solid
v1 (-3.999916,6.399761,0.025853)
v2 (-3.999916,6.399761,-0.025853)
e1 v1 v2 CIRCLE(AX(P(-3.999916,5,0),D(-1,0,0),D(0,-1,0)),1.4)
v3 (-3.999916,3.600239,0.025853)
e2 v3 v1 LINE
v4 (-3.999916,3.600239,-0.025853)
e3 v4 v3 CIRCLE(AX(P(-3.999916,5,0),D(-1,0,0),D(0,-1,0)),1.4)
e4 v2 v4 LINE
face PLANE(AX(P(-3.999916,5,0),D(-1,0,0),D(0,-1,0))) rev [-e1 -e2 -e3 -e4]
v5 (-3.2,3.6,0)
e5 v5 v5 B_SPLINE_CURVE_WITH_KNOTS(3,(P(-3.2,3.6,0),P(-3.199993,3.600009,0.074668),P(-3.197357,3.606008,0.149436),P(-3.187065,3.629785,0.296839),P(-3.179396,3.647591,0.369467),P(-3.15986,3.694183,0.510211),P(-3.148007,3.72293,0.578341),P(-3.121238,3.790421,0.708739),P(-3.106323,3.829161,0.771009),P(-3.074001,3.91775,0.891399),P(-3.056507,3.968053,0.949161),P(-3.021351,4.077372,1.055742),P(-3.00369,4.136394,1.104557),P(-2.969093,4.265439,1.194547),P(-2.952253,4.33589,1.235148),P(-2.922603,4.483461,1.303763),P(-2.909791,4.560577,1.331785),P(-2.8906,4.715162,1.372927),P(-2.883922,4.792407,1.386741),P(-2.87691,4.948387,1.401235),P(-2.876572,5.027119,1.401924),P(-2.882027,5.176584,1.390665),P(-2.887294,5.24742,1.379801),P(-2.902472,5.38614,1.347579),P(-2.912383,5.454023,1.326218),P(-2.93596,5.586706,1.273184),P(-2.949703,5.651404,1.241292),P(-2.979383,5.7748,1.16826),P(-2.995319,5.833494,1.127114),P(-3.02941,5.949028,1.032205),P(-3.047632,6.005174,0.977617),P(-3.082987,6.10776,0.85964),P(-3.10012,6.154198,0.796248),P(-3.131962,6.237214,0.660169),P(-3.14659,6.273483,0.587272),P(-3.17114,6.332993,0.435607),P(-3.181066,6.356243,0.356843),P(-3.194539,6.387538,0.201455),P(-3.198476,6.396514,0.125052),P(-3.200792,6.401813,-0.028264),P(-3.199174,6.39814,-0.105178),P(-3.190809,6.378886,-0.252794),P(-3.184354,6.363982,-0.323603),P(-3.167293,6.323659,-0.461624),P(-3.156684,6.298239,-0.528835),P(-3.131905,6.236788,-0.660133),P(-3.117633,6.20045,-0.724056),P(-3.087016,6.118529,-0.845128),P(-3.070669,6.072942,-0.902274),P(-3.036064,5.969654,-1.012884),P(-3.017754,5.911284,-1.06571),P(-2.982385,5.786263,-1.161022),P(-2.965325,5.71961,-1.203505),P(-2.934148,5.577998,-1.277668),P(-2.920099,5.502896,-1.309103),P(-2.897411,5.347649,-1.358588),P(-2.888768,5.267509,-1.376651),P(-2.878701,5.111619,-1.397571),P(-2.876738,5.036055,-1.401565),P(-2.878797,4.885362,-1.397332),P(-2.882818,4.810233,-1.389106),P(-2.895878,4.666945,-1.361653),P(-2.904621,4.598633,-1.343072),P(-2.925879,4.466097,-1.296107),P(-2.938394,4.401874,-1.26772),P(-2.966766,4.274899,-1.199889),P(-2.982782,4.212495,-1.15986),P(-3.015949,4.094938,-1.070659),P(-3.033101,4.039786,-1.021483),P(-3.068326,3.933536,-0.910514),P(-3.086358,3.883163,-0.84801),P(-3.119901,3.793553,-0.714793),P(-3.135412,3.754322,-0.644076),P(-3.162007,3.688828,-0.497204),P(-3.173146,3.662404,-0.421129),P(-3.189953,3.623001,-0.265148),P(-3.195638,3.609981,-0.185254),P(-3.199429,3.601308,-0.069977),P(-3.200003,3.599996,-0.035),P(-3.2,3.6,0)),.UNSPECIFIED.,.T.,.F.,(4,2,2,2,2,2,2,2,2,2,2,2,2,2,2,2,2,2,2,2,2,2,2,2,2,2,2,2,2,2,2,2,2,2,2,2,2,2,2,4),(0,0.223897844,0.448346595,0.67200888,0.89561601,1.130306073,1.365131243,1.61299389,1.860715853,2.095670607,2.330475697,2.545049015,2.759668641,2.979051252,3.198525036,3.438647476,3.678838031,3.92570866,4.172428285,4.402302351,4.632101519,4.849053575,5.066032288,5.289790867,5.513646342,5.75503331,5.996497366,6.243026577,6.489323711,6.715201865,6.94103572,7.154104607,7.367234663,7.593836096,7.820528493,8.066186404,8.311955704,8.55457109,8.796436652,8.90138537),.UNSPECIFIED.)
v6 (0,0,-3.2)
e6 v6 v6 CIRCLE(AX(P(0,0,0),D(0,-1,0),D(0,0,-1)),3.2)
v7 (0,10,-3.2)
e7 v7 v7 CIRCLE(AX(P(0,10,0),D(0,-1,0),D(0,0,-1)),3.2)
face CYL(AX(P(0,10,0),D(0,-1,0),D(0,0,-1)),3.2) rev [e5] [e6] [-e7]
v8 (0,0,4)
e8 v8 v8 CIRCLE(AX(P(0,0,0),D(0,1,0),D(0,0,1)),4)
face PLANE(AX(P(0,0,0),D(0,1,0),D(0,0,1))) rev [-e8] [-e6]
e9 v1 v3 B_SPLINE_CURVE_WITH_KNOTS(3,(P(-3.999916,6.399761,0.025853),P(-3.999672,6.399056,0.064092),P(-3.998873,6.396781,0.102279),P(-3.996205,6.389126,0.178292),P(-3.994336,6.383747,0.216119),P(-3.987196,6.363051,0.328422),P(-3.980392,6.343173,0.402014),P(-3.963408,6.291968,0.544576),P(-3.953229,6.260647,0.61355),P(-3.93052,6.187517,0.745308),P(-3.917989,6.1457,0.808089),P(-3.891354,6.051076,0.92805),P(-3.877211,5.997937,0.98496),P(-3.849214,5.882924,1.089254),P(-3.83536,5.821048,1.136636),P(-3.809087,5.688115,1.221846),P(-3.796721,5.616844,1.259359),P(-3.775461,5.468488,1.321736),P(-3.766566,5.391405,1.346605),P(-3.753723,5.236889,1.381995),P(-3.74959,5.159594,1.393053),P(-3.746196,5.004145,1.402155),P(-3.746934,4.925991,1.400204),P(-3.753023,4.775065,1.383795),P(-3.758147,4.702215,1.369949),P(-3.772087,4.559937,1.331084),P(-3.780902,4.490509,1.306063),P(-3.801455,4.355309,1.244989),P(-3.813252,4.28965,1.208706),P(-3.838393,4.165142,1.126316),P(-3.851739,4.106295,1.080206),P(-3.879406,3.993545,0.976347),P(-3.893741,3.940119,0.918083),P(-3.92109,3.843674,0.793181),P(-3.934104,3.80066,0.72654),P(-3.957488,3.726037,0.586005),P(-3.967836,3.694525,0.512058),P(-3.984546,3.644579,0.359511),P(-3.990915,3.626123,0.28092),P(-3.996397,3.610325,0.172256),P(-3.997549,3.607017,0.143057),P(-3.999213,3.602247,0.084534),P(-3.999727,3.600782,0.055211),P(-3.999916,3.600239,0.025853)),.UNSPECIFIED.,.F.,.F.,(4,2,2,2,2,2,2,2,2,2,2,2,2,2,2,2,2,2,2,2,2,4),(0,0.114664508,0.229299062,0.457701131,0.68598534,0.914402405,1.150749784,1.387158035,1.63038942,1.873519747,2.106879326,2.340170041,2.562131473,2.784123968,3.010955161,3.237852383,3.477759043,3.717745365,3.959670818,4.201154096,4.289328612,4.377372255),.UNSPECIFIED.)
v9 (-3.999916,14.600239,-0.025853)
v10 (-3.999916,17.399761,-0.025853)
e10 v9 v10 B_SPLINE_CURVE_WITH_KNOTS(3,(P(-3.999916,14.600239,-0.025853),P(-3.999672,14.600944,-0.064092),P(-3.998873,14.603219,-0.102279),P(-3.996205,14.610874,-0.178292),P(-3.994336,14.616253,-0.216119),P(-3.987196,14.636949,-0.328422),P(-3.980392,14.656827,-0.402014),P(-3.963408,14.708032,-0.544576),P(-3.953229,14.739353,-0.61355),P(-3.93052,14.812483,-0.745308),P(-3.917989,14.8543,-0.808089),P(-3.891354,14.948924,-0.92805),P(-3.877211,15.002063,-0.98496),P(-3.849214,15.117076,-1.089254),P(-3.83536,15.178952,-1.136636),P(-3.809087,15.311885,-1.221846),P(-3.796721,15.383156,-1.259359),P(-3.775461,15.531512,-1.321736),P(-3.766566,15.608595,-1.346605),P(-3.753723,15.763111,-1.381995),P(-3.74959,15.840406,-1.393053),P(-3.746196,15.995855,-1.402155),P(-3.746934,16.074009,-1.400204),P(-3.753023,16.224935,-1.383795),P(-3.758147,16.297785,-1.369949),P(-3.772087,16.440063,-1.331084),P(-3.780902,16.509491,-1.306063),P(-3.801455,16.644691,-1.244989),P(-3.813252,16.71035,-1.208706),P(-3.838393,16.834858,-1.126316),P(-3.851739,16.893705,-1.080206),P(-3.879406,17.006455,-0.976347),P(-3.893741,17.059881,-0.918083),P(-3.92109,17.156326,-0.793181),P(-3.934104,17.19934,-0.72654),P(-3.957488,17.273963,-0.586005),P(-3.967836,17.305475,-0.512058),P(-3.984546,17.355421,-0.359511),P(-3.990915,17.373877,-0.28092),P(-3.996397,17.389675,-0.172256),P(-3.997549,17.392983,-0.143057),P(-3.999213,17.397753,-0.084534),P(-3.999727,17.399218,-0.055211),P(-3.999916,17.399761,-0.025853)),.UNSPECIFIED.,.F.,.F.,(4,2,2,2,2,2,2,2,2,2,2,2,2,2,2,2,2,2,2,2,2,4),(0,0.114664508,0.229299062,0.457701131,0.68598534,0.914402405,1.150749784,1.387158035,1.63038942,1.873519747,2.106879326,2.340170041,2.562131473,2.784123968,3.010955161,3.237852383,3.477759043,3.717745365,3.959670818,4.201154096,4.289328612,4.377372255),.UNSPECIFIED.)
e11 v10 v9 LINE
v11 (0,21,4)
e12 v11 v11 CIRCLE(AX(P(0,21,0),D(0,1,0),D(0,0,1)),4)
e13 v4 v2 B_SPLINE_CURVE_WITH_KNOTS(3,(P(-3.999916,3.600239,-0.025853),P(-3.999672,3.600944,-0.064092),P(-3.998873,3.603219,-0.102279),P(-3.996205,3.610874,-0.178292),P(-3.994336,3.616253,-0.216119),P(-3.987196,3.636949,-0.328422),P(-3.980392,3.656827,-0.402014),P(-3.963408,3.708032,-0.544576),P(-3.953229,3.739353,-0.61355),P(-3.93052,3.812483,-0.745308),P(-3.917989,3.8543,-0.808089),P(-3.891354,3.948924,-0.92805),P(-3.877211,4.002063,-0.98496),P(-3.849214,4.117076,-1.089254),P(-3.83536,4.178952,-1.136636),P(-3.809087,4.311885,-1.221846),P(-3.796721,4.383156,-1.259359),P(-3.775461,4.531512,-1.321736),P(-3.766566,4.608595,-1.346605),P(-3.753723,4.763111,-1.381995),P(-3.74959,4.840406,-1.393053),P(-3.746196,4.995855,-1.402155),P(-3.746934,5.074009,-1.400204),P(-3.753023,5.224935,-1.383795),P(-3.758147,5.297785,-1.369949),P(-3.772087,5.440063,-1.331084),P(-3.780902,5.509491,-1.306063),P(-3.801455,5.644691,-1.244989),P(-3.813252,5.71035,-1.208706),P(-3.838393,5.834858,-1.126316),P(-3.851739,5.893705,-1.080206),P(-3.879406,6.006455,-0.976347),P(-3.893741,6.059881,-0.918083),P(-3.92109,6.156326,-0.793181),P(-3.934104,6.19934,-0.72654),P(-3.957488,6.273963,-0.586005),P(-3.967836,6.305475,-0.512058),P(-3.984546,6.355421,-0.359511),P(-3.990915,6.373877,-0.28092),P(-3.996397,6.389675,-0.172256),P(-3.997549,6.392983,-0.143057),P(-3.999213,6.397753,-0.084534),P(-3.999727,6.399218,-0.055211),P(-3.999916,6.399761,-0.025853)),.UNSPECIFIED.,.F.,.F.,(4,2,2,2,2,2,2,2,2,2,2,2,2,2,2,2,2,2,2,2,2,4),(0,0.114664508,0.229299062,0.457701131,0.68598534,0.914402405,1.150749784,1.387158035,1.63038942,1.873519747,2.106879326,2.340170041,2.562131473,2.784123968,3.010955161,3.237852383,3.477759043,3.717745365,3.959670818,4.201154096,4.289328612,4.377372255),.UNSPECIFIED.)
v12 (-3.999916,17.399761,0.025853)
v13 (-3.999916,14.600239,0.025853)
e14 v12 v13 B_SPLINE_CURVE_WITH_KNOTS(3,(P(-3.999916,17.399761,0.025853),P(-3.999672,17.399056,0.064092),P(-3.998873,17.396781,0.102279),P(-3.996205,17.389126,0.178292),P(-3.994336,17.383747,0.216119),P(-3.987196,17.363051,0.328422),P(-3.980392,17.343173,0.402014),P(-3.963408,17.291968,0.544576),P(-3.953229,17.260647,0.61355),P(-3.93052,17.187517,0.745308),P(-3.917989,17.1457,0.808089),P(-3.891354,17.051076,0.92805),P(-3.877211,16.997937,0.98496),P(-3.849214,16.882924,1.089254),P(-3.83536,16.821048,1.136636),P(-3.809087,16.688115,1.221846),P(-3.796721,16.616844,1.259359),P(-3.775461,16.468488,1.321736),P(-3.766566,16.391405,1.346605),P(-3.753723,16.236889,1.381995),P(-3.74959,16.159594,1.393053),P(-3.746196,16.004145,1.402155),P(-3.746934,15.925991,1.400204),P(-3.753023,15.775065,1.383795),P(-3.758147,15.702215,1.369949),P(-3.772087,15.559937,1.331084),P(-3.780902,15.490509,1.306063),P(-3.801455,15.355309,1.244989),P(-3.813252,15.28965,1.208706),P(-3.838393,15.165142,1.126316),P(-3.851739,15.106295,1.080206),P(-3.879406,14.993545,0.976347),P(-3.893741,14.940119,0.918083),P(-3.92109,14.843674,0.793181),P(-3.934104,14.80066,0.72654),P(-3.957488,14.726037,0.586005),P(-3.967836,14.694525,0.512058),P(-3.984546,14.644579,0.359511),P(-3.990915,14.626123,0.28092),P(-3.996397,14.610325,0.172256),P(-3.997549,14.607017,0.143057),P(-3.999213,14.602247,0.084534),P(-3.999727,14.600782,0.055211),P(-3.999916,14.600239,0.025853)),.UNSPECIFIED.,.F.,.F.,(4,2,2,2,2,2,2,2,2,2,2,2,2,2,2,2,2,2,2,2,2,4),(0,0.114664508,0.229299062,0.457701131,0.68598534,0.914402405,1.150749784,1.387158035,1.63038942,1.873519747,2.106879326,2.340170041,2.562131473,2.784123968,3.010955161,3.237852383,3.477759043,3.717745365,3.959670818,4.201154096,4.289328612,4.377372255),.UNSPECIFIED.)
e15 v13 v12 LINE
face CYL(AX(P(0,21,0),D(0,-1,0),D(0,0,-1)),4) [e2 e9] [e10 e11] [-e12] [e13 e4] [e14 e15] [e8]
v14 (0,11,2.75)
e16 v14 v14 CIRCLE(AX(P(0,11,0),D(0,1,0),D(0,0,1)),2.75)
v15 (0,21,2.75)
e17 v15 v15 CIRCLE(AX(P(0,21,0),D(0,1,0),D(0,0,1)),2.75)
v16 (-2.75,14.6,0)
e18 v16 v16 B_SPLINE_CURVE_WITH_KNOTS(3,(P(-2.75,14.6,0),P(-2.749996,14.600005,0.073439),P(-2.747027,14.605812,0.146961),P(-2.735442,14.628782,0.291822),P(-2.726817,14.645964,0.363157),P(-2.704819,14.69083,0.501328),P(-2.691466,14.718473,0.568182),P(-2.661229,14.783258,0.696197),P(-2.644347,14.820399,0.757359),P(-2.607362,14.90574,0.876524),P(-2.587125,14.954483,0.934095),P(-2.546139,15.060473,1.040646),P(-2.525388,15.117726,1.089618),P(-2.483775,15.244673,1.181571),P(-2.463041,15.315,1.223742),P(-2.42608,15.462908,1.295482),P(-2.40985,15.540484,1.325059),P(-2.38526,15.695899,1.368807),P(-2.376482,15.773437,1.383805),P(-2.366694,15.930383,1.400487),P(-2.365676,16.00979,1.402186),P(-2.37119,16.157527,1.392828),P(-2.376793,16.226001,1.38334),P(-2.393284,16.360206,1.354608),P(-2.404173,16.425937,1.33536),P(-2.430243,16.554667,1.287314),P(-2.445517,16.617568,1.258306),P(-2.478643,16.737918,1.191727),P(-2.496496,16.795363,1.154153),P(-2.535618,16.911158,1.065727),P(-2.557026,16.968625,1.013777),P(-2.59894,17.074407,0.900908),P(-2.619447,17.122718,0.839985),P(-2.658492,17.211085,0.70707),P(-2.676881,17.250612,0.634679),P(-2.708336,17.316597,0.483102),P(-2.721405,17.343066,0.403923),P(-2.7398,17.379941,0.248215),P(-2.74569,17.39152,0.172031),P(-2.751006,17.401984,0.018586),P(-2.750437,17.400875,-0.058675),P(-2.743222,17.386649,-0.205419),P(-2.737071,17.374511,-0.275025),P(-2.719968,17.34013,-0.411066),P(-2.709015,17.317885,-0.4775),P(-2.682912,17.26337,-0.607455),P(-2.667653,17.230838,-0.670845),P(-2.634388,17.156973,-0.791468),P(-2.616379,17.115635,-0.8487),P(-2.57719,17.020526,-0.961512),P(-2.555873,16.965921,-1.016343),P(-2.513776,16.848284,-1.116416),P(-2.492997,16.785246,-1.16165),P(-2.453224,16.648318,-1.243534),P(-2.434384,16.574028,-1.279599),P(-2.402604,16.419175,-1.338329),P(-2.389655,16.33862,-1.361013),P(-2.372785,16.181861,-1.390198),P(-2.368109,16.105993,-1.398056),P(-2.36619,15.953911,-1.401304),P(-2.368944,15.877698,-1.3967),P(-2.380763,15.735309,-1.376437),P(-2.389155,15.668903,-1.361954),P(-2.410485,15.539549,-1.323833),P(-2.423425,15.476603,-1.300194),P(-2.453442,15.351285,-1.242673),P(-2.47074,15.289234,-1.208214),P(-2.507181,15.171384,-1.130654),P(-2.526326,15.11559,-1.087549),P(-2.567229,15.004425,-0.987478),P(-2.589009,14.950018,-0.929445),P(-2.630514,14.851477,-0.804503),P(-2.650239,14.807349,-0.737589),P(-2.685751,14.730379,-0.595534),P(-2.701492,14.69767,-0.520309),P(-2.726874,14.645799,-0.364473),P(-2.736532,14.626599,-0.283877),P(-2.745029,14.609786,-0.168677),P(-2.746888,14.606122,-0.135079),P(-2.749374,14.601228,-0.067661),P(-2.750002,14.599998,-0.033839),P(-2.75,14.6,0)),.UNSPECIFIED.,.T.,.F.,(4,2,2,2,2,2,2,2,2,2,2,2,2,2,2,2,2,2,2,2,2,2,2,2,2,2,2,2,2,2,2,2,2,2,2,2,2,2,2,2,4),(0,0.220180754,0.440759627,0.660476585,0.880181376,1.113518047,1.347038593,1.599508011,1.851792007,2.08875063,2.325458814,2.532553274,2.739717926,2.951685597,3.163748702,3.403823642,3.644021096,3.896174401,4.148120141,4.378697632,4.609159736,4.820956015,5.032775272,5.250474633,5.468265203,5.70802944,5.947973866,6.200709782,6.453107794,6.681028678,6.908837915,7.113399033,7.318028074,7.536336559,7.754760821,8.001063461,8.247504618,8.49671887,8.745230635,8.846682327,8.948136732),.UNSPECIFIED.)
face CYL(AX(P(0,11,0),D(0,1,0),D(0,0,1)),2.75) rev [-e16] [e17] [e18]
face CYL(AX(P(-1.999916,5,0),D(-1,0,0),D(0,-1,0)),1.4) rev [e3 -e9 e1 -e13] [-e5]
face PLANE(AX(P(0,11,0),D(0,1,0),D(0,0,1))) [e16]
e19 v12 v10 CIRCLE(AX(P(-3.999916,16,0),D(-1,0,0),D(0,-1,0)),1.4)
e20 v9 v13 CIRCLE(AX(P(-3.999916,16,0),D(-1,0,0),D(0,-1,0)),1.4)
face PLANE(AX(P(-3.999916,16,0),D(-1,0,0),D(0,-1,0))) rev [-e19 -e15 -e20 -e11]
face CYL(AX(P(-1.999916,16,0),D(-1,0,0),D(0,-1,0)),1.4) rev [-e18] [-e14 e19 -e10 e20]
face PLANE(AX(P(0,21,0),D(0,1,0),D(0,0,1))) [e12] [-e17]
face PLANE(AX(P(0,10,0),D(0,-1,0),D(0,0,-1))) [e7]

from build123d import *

# Parameters (mm, degrees)
SKETCH1_R           = 4
BOSS_EXTRUDE1_DEPTH = 21
SKETCH2_R           = 3.2
CUT_EXTRUDE1_DEPTH  = 10
SKETCH3_R           = 2.75
CUT_EXTRUDE3_DEPTH  = 10


with BuildPart() as part:
    # Sketch1 → Boss-Extrude1 (new body)
    with BuildSketch(Plane(origin=(0, 0, 0), x_dir=(1, 0, 0), z_dir=(0, 1, 0))):
        with Locations(Location((0, 0, 0), (0, 0, 90))):
            Circle(SKETCH1_R)
    extrude(amount=BOSS_EXTRUDE1_DEPTH)

    # Sketch2 → Cut-Extrude1 (cut)
    with BuildSketch(Plane.XZ):
        with Locations(Location((0, 0, 0), (0, 0, 270))):
            Circle(SKETCH2_R)
    extrude(amount=-CUT_EXTRUDE1_DEPTH, mode=Mode.SUBTRACT)

    # Sketch3 → Cut-Extrude3 (cut)
    with BuildSketch(Plane(origin=(0, 21, 0), x_dir=(1, 0, 0), z_dir=(0, 1, 0))):
        with Locations(Location((0, 0, 0), (0, 0, 270))):
            Circle(SKETCH3_R)
    extrude(amount=-CUT_EXTRUDE3_DEPTH, mode=Mode.SUBTRACT)

    # Cut-Extrude5: read off the stored shape, not the designer's step
    # Cut-Extrude5: loft between two sections, ruled curve by curve
    cut_extrude5_from = [
        Edge.make_three_point_arc((-2.36677924, 14.6, 0), (-2.36677924, 16, 1.4), (-2.36677924, 17.4, 0)),
        Edge.make_three_point_arc((-2.36677924, 17.4, 0), (-2.36677924, 16, -1.4), (-2.36677924, 14.6, 0)),
    ]
    cut_extrude5_to = [
        Edge.make_three_point_arc((-3.999916451, 14.6, 0), (-3.999916451, 16, 1.4), (-3.999916451, 17.4, 0)),
        Edge.make_three_point_arc((-3.999916451, 17.4, 0), (-3.999916451, 16, -1.4), (-3.999916451, 14.6, 0)),
    ]
    cut_extrude5 = Solid(Shell([*[Face.make_surface_from_curves(cut_extrude5_from[k], cut_extrude5_to[k]) for k in range(2)], Face(Wire(cut_extrude5_from)), Face(Wire(cut_extrude5_to))]))
    add(cut_extrude5, mode=Mode.SUBTRACT)

    # Cut-Extrude5 2: loft between two sections, ruled curve by curve
    cut_extrude5_2_from = [
        Edge.make_three_point_arc((-2.877351837, 3.6, 0), (-2.877351837, 5, 1.4), (-2.877351837, 6.4, 0)),
        Edge.make_three_point_arc((-2.877351837, 6.4, 0), (-2.877351837, 5, -1.4), (-2.877351837, 3.6, 0)),
    ]
    cut_extrude5_2_to = [
        Edge.make_three_point_arc((-3.999916451, 3.6, 0), (-3.999916451, 5, 1.4), (-3.999916451, 6.4, 0)),
        Edge.make_three_point_arc((-3.999916451, 6.4, 0), (-3.999916451, 5, -1.4), (-3.999916451, 3.6, 0)),
    ]
    cut_extrude5_2 = Solid(Shell([*[Face.make_surface_from_curves(cut_extrude5_2_from[k], cut_extrude5_2_to[k]) for k in range(2)], Face(Wire(cut_extrude5_2_from)), Face(Wire(cut_extrude5_2_to))]))
    add(cut_extrude5_2, mode=Mode.SUBTRACT)


solid = part.part
